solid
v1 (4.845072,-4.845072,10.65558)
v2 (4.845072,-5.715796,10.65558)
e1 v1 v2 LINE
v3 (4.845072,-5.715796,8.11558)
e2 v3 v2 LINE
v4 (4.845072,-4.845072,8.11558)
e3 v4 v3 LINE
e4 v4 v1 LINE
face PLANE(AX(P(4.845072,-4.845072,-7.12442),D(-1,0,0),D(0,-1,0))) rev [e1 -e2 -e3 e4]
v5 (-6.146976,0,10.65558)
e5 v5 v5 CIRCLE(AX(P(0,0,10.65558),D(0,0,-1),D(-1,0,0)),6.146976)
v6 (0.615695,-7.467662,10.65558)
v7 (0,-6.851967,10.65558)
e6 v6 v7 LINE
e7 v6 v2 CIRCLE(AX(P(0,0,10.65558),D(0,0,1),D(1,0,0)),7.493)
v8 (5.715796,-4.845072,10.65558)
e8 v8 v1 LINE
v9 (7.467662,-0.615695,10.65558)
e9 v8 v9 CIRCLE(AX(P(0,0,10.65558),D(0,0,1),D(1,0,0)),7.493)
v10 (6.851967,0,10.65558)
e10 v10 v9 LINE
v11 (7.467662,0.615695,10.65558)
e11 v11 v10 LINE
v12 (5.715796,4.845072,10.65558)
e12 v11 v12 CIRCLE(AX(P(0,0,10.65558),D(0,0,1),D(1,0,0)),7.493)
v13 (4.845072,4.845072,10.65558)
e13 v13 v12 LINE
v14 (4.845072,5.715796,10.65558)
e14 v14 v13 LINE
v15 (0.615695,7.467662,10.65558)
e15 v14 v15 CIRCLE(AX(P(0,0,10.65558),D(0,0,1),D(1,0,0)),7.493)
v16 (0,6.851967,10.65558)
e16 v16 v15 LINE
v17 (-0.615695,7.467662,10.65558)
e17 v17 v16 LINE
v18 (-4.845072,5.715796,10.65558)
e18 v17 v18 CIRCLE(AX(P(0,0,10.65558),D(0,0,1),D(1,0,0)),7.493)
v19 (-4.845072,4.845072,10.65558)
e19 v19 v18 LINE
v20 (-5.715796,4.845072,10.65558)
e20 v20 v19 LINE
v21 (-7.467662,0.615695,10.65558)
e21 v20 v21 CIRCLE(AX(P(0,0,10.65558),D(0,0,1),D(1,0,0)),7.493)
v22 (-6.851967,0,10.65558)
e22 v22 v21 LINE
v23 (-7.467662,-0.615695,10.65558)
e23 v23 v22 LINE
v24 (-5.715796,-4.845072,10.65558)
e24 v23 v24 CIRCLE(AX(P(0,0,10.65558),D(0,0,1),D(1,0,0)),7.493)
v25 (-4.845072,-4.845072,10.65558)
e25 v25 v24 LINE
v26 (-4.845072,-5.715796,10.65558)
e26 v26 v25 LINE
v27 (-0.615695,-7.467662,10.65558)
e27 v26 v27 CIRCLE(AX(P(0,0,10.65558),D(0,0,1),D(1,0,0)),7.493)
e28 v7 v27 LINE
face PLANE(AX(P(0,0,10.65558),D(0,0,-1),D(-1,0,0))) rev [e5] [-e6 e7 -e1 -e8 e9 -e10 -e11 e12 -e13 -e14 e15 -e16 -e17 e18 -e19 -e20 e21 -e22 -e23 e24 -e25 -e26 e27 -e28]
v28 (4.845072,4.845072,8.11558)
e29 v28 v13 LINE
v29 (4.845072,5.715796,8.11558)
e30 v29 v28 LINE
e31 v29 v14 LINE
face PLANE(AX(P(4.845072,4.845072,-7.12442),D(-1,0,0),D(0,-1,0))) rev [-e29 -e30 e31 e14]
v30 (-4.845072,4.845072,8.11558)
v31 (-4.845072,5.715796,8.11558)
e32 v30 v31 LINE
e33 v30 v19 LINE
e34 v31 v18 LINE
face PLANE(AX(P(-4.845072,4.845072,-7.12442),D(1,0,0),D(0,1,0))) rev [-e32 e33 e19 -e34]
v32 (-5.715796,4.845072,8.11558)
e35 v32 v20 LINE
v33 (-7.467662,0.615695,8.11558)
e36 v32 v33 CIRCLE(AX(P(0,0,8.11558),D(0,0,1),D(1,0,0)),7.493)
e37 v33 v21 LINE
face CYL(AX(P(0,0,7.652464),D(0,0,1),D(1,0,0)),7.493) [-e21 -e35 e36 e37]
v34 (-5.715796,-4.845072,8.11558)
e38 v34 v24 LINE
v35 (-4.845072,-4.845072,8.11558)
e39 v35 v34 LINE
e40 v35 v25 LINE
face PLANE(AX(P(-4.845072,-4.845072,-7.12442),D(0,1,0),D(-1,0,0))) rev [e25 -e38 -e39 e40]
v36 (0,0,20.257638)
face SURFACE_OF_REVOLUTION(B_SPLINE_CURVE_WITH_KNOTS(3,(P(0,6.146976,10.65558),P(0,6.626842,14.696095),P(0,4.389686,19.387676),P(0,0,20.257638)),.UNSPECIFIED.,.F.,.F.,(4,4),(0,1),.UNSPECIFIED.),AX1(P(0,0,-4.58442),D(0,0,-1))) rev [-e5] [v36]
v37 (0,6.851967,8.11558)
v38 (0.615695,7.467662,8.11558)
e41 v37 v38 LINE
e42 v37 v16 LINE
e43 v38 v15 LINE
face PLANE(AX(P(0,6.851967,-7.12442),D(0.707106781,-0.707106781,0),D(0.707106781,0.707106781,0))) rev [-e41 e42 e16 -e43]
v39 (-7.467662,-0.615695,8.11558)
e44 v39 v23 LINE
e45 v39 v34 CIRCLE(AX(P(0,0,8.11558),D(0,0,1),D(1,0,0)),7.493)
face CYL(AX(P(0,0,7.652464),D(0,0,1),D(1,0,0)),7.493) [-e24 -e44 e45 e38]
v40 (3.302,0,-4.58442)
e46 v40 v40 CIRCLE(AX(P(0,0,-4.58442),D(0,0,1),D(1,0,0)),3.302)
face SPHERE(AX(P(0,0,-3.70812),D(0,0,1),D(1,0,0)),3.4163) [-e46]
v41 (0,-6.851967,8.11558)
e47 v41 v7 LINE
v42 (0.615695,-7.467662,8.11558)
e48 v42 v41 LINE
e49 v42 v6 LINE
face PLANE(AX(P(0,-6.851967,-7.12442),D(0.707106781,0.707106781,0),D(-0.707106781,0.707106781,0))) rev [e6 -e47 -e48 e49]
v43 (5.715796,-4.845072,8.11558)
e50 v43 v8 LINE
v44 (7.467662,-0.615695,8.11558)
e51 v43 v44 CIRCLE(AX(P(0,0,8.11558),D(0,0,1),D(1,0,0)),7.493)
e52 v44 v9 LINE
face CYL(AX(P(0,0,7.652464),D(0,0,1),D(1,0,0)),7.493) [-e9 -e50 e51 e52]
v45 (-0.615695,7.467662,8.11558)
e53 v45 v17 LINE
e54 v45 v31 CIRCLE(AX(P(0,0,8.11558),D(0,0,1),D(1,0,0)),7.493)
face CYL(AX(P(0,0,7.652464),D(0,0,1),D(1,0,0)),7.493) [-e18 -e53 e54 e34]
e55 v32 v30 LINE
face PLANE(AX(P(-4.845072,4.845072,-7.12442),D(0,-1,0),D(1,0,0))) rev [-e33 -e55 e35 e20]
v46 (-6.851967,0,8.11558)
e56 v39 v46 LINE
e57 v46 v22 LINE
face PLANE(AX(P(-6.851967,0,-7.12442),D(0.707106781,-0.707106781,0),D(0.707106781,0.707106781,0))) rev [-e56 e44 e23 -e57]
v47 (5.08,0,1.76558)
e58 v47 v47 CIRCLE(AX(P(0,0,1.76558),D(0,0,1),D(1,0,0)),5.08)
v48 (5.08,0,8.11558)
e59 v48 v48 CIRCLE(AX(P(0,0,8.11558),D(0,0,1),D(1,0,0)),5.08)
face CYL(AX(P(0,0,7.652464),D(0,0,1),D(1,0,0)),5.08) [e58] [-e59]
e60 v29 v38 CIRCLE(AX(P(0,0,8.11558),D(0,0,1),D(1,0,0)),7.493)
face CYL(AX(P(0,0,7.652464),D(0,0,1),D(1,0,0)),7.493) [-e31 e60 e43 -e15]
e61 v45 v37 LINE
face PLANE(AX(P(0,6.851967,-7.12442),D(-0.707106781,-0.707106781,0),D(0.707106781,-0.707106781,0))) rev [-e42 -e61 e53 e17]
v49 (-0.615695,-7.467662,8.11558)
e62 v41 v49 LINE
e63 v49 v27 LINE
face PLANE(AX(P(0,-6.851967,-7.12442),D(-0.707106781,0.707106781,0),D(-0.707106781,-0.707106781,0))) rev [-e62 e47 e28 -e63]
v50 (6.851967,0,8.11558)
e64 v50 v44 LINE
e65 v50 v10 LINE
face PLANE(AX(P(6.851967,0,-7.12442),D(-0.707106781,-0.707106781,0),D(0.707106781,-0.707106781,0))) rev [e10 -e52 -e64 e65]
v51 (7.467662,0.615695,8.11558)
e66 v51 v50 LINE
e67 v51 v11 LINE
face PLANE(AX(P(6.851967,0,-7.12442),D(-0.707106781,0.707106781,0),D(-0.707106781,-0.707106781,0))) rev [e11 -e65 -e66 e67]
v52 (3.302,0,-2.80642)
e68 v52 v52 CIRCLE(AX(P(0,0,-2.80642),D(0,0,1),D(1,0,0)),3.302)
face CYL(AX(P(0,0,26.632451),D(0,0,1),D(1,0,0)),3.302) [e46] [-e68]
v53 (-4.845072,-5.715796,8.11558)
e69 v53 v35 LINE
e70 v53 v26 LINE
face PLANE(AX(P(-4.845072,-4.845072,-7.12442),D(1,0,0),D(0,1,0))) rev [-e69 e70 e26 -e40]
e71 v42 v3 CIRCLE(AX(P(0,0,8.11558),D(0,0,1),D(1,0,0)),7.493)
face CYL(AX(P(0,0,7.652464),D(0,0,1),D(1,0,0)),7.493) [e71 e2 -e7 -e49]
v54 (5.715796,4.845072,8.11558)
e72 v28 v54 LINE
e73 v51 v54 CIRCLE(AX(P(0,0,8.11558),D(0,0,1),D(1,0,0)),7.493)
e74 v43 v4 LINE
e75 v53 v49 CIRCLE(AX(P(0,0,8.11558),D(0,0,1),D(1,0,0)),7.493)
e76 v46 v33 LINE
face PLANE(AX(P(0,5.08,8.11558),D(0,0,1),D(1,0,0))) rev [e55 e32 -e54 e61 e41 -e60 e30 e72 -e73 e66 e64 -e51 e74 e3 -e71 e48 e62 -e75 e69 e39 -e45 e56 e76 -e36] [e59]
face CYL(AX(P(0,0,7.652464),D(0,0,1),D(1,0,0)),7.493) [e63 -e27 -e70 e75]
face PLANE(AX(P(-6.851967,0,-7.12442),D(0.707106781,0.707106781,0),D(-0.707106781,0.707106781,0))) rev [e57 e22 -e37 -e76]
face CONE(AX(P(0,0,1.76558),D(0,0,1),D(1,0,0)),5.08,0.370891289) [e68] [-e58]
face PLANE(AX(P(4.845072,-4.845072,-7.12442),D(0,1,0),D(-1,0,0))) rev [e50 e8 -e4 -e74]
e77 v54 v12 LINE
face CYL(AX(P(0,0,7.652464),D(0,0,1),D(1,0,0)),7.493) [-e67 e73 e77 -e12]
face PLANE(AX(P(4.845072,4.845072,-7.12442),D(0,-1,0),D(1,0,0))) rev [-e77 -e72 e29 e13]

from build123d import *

# Parameters (mm, degrees)
DOME2_FACE_RADIUS  = 3.302
DOME2_HEIGHT       = 2.54
CUT_EXTRUDE2_DEPTH = 21.698272827
SEEDCUT_COUNT      = 8


# Read off the part's stored shape, not the designer's step: Cut-Revolve-Thin5
with BuildPart() as part:
    # Sketch5 → Revolve1 (revolve)
    with BuildSketch(Plane(origin=(0, 0, 0), x_dir=(0, 0, -1), z_dir=(1, 0, 0)), mode=Mode.PRIVATE) as revolve1_sk:
        Polygon((-10.655580084, 0), (-10.655580084, 7.493), (-8.115580084, 7.493), (-8.115580084, 5.08), (4.584419916, 5.08), (4.584419916, 0), align=None)
    revolve(revolve1_sk.sketch.rotate(Axis((0, 0, 7.652463568), (0, 0, -1)), 90), axis=Axis((0, 0, 7.652463568), (0, 0, -1)))

    # Sketch8 → Revolve3 (revolve)
    with BuildSketch(Plane(origin=(0, 0, 0), x_dir=(0, 0, -1), z_dir=(1, 0, 0))):
        with BuildLine():
            Line((-20.257637537, 0), (-10.655580084, 0))
            Line((-10.655580084, 0), (-10.655580084, 6.146975902))
            add(Edge.make_bspline(
                [(-10.655580084, 6.146975902), (-14.696094585, 6.626842046), (-19.387675836, 4.389685938), (-20.257637537, 0)],
                knots=[0, 0, 0, 0, 1, 1, 1, 1], degree=3))
        make_face()
    revolve(axis=Axis((0, 0, 7.652463568), (0, 0, 1)))

    # Cut-Revolve-Thin5 outline → Cut-Revolve-Thin5 (revolve, cut)
    with BuildSketch(Plane.XZ):
        Polygon((3.302, -2.806419916), (3.302, -4.584419916), (5.08, -4.584419916), (5.08, 1.765580084), align=None)
    revolve(axis=Axis((0, 0, 0), (0, 0, 1)), mode=Mode.SUBTRACT)

    # Dome2: a dome of height H over a round flat face of radius A is a cap of a sphere of radius (A * A + H * H) / (2 * H)
    dome2_r = (DOME2_FACE_RADIUS * DOME2_FACE_RADIUS + DOME2_HEIGHT * DOME2_HEIGHT) / (2 * DOME2_HEIGHT)
    dome2_base = Plane((0, 0, -4.584419916), z_dir=(0, 0, -1))
    with Locations(dome2_base.offset(DOME2_HEIGHT - dome2_r)):
        dome2_ball = Sphere(dome2_r, mode=Mode.PRIVATE)
    add(split(dome2_ball, bisect_by=dome2_base, keep=Keep.TOP, mode=Mode.PRIVATE))

    # Sketch12 → Cut-Extrude2 (cut, through all)
    with BuildSketch(Plane.XY.offset(10.655580084)):
        with BuildLine():
            Line((0, 6.851966826), (0.615694723, 7.467661549))
            ThreePointArc((0.615694723, 7.467661549), (0, 7.493), (-0.615694723, 7.467661549))
            Line((-0.615694723, 7.467661549), (0, 6.851966826))
        make_face()
    cut_extrude2 = extrude(amount=-CUT_EXTRUDE2_DEPTH, mode=Mode.SUBTRACT)

    # SeedCut: Cut-Extrude2 ×8 about axis
    seedcut_axis = Axis((0, 0, 0), (0, 0, 1))
    for i in range(1, SEEDCUT_COUNT):
        add(cut_extrude2.rotate(seedcut_axis, i * 360 / SEEDCUT_COUNT), mode=Mode.SUBTRACT)


solid = part.part
